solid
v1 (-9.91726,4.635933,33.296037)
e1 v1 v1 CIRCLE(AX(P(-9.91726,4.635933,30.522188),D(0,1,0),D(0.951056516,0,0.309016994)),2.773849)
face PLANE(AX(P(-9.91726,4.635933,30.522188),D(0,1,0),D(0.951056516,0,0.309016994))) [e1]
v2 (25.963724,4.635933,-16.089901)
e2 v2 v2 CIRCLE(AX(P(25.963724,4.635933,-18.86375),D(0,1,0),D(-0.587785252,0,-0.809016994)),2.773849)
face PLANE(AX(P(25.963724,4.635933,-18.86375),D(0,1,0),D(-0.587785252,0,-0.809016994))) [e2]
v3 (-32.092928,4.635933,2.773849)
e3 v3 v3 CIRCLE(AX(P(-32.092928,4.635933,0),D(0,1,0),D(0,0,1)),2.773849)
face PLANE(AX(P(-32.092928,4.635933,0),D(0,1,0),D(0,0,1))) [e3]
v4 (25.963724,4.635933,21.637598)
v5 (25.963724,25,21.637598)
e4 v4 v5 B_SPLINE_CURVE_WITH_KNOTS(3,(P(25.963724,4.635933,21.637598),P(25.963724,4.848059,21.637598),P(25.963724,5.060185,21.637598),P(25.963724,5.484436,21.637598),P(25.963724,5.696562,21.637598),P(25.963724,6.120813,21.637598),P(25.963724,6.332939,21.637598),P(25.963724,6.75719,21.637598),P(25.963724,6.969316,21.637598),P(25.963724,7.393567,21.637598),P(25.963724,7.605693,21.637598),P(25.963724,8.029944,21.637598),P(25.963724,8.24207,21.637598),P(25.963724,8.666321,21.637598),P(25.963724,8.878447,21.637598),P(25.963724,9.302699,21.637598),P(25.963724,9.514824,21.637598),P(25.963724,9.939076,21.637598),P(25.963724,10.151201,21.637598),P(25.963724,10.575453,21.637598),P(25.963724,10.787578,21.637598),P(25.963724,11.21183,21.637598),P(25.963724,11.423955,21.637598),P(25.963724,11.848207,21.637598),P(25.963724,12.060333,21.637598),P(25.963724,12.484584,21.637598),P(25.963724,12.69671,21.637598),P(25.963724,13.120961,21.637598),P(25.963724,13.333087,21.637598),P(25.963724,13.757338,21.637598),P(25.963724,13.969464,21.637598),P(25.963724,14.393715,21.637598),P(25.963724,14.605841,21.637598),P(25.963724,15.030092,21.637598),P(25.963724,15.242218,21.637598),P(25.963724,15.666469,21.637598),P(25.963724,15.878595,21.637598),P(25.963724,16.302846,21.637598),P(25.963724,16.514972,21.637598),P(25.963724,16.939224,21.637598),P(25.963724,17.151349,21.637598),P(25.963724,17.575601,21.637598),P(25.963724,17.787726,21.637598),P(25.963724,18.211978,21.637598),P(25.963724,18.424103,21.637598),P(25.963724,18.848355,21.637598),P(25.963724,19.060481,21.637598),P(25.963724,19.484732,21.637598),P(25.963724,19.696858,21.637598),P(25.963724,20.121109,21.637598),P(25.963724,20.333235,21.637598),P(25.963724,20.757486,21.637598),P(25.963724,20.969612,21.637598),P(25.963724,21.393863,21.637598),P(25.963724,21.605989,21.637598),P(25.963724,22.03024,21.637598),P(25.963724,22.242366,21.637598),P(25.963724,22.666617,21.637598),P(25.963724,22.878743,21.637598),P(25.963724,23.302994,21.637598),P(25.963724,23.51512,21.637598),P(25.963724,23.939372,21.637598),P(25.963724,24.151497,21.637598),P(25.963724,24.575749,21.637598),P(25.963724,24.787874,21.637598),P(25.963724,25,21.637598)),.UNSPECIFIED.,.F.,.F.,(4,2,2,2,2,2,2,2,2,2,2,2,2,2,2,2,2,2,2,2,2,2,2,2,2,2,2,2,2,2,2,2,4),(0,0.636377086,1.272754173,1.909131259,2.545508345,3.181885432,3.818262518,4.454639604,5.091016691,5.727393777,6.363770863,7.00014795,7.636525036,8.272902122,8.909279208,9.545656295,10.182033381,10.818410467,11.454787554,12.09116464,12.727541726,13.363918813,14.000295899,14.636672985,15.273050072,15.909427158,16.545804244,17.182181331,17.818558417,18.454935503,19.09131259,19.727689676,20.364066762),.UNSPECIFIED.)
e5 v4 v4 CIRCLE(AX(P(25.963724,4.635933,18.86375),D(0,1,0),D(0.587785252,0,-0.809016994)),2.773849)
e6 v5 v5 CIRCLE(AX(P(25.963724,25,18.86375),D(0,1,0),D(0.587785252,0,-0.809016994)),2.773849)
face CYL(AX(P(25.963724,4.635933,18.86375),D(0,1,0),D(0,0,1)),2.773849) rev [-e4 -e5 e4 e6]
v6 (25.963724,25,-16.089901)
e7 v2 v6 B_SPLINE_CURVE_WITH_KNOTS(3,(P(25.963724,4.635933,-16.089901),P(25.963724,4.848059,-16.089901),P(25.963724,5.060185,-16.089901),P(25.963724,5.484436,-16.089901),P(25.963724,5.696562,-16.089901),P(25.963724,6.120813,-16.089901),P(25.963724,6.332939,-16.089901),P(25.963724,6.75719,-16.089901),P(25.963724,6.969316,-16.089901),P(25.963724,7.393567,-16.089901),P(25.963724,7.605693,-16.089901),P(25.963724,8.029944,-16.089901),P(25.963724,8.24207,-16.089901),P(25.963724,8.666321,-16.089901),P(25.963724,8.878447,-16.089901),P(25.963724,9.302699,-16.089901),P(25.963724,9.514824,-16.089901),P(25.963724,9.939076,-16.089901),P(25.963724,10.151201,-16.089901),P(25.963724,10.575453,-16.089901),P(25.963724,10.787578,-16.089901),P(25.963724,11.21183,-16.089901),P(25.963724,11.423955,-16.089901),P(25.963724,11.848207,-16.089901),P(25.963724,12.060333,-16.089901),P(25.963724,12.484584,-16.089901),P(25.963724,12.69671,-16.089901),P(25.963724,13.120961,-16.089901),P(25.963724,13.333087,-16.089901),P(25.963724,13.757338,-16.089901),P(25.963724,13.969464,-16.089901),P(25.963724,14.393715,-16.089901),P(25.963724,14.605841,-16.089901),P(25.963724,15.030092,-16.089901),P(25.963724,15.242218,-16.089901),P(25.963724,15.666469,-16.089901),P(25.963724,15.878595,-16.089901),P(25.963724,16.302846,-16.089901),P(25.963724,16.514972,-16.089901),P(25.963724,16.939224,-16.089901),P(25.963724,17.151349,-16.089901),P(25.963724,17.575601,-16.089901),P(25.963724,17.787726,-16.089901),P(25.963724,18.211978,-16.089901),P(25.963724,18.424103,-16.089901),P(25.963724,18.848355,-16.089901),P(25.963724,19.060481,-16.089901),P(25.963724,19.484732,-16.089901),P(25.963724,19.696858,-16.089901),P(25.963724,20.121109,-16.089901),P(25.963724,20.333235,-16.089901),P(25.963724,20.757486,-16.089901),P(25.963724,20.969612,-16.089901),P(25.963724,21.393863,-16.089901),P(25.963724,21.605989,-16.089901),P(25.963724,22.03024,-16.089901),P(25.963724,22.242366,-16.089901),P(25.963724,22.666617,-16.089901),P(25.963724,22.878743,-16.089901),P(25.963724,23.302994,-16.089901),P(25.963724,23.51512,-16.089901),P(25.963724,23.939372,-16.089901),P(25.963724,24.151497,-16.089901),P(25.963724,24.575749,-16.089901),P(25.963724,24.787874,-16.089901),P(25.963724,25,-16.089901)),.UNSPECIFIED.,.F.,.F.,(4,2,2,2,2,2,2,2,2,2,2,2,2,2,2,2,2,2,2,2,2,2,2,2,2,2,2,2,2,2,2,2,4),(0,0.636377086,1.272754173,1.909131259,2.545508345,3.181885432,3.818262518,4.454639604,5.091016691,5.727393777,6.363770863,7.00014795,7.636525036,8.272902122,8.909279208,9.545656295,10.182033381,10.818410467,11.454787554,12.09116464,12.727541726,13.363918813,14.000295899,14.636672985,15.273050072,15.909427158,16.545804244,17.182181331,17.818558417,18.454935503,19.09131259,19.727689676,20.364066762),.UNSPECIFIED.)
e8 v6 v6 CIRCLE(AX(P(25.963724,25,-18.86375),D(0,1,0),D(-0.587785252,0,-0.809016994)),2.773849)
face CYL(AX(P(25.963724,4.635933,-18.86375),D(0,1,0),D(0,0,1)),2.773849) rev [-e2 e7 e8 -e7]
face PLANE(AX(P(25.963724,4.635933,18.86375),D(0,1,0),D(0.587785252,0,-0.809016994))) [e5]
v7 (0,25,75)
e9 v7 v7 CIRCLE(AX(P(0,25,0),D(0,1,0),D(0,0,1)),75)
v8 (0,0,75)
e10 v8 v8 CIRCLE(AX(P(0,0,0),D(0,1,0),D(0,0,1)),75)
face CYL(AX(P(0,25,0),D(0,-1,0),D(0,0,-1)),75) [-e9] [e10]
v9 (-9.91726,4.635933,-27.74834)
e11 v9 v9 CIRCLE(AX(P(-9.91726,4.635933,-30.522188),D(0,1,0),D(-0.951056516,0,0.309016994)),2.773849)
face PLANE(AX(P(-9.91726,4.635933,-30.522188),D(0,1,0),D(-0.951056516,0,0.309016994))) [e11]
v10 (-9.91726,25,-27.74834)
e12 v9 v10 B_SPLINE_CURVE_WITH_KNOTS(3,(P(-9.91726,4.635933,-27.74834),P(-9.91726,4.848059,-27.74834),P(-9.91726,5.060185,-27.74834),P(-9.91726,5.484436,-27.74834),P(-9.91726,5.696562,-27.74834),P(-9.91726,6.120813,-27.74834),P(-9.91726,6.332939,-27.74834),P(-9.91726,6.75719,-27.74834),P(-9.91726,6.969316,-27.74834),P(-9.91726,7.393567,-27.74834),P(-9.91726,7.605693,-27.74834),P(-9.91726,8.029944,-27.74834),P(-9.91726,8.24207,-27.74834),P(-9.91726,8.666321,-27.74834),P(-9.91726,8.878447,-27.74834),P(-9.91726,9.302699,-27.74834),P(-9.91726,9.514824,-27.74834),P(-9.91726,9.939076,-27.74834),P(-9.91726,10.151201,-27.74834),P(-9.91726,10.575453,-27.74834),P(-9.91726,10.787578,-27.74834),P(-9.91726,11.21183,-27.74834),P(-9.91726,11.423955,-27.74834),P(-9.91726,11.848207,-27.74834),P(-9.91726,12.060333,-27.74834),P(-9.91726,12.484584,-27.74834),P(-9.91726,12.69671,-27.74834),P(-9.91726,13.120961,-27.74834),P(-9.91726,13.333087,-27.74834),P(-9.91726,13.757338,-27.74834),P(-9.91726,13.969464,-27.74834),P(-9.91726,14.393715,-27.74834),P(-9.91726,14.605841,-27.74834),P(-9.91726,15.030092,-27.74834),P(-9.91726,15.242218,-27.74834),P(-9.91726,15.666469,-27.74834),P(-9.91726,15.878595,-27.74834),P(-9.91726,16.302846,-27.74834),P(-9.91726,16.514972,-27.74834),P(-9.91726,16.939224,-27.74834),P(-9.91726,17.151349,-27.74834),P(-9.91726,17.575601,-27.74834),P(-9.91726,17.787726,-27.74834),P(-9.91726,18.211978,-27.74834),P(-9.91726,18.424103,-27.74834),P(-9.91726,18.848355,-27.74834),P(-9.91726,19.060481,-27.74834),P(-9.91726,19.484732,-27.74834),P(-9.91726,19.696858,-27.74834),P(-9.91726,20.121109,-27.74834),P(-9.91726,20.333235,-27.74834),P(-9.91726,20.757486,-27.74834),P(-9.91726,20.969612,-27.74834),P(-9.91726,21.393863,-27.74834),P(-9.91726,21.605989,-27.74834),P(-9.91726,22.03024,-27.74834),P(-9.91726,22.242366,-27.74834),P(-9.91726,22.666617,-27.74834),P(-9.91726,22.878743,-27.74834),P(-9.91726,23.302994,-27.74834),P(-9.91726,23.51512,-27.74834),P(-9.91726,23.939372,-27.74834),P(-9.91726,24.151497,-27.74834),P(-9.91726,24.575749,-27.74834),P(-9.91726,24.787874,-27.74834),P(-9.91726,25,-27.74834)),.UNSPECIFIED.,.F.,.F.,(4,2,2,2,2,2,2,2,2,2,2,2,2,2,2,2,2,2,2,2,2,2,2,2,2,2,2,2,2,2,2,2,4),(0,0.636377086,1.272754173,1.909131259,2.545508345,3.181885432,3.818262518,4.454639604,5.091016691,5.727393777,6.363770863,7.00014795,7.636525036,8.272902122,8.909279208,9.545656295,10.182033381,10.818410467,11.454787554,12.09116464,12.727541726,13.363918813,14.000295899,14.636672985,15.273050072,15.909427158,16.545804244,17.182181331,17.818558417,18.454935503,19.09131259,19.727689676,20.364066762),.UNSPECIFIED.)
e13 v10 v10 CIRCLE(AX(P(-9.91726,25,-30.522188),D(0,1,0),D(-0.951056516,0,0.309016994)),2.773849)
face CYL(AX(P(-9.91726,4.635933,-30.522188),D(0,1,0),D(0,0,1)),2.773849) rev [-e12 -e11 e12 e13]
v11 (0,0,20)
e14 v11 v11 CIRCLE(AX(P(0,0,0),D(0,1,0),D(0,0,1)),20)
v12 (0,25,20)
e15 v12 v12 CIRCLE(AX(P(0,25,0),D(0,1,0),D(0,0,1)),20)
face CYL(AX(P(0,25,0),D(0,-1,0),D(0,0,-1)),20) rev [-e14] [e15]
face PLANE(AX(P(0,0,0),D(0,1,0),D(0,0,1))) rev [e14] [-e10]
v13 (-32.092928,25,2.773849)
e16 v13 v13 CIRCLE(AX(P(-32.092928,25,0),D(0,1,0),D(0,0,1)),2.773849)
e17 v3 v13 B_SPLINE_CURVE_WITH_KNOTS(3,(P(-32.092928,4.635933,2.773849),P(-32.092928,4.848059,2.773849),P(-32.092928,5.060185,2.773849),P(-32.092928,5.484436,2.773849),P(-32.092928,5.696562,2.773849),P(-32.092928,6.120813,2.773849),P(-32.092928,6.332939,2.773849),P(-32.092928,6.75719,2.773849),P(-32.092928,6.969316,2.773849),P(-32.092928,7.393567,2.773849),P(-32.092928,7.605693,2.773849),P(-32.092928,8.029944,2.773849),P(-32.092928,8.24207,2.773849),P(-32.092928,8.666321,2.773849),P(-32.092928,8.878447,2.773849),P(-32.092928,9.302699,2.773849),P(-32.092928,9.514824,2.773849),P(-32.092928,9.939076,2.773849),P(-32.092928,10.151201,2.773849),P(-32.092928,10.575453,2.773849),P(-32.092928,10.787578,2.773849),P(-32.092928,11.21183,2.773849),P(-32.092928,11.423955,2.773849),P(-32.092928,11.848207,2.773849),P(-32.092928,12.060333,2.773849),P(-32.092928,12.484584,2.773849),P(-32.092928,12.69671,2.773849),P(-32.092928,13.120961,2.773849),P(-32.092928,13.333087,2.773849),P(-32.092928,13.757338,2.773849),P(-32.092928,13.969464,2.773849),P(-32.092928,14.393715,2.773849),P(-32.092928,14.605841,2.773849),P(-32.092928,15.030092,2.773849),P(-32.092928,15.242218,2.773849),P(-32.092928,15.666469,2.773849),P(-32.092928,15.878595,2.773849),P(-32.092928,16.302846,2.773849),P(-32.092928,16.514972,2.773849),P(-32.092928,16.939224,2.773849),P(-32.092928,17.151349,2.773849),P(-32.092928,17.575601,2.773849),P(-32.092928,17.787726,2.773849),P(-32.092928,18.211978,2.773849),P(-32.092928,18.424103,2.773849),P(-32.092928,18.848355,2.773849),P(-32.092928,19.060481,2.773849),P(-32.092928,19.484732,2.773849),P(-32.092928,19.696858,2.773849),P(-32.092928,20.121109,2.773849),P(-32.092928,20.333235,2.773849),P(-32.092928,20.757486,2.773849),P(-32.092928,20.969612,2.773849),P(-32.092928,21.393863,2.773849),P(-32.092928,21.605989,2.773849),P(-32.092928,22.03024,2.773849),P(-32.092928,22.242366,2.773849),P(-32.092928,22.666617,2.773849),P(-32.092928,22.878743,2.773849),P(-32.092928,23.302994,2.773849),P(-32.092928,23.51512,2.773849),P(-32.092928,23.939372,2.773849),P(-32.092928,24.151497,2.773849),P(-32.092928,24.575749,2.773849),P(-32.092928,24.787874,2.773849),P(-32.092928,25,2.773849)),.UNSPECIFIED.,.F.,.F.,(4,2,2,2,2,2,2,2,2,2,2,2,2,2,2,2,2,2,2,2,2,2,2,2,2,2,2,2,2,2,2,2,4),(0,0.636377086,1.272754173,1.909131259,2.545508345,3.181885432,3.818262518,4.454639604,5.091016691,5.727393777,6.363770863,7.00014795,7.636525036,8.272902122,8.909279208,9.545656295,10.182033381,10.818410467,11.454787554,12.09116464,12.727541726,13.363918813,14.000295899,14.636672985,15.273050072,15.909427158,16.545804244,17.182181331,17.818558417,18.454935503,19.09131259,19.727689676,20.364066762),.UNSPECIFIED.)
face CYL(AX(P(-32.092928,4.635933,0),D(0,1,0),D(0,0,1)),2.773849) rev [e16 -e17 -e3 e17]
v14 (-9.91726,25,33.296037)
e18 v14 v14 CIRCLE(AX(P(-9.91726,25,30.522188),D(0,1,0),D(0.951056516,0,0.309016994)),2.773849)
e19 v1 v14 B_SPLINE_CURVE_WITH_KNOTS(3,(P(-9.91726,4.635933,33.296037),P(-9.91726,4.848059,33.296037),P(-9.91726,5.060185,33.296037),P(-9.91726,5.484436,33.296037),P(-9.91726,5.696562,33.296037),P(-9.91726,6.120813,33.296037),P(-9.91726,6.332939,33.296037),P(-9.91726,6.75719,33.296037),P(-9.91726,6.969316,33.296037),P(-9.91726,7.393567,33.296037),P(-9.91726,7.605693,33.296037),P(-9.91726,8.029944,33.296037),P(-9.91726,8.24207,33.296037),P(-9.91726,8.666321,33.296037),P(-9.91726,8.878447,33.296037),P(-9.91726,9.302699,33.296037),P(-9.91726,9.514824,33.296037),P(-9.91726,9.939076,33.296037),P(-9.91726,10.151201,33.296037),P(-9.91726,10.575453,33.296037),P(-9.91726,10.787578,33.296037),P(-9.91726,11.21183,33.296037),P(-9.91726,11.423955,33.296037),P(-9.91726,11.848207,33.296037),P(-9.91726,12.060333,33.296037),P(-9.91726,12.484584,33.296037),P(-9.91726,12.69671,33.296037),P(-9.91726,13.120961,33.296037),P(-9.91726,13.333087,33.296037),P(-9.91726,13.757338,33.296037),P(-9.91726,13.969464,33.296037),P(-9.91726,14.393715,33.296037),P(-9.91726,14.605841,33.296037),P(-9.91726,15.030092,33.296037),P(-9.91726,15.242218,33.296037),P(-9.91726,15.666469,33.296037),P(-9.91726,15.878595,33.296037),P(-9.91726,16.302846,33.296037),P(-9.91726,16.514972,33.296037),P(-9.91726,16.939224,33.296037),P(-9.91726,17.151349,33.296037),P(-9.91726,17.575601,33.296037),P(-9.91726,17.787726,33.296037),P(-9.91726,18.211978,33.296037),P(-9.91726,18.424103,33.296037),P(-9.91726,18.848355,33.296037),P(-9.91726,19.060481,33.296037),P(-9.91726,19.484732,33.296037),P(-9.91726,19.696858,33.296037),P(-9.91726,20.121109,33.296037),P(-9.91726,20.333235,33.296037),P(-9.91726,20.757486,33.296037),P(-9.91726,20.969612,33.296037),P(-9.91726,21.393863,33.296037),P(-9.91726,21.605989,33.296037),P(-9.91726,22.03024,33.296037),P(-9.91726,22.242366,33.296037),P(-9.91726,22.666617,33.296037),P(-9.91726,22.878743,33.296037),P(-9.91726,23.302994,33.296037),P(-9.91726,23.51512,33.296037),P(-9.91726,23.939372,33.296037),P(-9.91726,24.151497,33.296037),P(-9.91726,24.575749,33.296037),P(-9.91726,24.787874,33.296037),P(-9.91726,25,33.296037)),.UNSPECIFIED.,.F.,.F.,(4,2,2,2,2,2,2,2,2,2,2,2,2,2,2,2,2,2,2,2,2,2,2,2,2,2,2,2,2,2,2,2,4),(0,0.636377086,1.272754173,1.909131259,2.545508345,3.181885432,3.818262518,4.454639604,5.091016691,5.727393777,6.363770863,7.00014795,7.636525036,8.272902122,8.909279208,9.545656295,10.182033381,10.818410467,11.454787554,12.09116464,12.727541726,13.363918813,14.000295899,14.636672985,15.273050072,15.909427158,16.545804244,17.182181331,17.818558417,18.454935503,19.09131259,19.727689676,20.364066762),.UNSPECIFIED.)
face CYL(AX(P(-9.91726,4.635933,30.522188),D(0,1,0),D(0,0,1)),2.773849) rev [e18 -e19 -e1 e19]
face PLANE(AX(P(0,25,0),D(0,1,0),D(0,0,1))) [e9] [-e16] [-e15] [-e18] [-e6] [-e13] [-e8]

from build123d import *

# Parameters (mm, degrees)
SKETCH1_R           = 75
BOSS_EXTRUDE1_DEPTH = 25
SKETCH2_R           = 20
CUT_EXTRUDE1_DEPTH  = 109.972473589
SKETCH3_R           = 2.773848659
CUT_EXTRUDE2_DEPTH  = 20.364066762
CIRPATTERN1_COUNT   = 5


with BuildPart() as part:
    # Sketch1 → Boss-Extrude1 (new body)
    with BuildSketch(Plane(origin=(0, 0, 0), x_dir=(1, 0, 0), z_dir=(0, 1, 0))):
        Circle(SKETCH1_R)
    extrude(amount=BOSS_EXTRUDE1_DEPTH)

    # Sketch2 → Cut-Extrude1 (cut, through all)
    with BuildSketch(Plane(origin=(0, 0, 0), x_dir=(1, 0, 0), z_dir=(0, 1, 0))):
        Circle(SKETCH2_R)
    extrude(amount=CUT_EXTRUDE1_DEPTH, mode=Mode.SUBTRACT)

    # Sketch3 → Cut-Extrude2 (cut)
    with BuildSketch(Plane(origin=(0, 25, 0), x_dir=(1, 0, 0), z_dir=(0, 1, 0))):
        with Locations((-32.092928013, 0)):
            Circle(SKETCH3_R)
    cut_extrude2 = extrude(amount=-CUT_EXTRUDE2_DEPTH, mode=Mode.SUBTRACT)

    # CirPattern1: Cut-Extrude2 ×5 about axis
    cirpattern1_axis = Axis((0, 0, 0), (0, 1, 0))
    for i in range(1, CIRPATTERN1_COUNT):
        add(cut_extrude2.rotate(cirpattern1_axis, i * 360 / CIRPATTERN1_COUNT), mode=Mode.SUBTRACT)


solid = part.part
